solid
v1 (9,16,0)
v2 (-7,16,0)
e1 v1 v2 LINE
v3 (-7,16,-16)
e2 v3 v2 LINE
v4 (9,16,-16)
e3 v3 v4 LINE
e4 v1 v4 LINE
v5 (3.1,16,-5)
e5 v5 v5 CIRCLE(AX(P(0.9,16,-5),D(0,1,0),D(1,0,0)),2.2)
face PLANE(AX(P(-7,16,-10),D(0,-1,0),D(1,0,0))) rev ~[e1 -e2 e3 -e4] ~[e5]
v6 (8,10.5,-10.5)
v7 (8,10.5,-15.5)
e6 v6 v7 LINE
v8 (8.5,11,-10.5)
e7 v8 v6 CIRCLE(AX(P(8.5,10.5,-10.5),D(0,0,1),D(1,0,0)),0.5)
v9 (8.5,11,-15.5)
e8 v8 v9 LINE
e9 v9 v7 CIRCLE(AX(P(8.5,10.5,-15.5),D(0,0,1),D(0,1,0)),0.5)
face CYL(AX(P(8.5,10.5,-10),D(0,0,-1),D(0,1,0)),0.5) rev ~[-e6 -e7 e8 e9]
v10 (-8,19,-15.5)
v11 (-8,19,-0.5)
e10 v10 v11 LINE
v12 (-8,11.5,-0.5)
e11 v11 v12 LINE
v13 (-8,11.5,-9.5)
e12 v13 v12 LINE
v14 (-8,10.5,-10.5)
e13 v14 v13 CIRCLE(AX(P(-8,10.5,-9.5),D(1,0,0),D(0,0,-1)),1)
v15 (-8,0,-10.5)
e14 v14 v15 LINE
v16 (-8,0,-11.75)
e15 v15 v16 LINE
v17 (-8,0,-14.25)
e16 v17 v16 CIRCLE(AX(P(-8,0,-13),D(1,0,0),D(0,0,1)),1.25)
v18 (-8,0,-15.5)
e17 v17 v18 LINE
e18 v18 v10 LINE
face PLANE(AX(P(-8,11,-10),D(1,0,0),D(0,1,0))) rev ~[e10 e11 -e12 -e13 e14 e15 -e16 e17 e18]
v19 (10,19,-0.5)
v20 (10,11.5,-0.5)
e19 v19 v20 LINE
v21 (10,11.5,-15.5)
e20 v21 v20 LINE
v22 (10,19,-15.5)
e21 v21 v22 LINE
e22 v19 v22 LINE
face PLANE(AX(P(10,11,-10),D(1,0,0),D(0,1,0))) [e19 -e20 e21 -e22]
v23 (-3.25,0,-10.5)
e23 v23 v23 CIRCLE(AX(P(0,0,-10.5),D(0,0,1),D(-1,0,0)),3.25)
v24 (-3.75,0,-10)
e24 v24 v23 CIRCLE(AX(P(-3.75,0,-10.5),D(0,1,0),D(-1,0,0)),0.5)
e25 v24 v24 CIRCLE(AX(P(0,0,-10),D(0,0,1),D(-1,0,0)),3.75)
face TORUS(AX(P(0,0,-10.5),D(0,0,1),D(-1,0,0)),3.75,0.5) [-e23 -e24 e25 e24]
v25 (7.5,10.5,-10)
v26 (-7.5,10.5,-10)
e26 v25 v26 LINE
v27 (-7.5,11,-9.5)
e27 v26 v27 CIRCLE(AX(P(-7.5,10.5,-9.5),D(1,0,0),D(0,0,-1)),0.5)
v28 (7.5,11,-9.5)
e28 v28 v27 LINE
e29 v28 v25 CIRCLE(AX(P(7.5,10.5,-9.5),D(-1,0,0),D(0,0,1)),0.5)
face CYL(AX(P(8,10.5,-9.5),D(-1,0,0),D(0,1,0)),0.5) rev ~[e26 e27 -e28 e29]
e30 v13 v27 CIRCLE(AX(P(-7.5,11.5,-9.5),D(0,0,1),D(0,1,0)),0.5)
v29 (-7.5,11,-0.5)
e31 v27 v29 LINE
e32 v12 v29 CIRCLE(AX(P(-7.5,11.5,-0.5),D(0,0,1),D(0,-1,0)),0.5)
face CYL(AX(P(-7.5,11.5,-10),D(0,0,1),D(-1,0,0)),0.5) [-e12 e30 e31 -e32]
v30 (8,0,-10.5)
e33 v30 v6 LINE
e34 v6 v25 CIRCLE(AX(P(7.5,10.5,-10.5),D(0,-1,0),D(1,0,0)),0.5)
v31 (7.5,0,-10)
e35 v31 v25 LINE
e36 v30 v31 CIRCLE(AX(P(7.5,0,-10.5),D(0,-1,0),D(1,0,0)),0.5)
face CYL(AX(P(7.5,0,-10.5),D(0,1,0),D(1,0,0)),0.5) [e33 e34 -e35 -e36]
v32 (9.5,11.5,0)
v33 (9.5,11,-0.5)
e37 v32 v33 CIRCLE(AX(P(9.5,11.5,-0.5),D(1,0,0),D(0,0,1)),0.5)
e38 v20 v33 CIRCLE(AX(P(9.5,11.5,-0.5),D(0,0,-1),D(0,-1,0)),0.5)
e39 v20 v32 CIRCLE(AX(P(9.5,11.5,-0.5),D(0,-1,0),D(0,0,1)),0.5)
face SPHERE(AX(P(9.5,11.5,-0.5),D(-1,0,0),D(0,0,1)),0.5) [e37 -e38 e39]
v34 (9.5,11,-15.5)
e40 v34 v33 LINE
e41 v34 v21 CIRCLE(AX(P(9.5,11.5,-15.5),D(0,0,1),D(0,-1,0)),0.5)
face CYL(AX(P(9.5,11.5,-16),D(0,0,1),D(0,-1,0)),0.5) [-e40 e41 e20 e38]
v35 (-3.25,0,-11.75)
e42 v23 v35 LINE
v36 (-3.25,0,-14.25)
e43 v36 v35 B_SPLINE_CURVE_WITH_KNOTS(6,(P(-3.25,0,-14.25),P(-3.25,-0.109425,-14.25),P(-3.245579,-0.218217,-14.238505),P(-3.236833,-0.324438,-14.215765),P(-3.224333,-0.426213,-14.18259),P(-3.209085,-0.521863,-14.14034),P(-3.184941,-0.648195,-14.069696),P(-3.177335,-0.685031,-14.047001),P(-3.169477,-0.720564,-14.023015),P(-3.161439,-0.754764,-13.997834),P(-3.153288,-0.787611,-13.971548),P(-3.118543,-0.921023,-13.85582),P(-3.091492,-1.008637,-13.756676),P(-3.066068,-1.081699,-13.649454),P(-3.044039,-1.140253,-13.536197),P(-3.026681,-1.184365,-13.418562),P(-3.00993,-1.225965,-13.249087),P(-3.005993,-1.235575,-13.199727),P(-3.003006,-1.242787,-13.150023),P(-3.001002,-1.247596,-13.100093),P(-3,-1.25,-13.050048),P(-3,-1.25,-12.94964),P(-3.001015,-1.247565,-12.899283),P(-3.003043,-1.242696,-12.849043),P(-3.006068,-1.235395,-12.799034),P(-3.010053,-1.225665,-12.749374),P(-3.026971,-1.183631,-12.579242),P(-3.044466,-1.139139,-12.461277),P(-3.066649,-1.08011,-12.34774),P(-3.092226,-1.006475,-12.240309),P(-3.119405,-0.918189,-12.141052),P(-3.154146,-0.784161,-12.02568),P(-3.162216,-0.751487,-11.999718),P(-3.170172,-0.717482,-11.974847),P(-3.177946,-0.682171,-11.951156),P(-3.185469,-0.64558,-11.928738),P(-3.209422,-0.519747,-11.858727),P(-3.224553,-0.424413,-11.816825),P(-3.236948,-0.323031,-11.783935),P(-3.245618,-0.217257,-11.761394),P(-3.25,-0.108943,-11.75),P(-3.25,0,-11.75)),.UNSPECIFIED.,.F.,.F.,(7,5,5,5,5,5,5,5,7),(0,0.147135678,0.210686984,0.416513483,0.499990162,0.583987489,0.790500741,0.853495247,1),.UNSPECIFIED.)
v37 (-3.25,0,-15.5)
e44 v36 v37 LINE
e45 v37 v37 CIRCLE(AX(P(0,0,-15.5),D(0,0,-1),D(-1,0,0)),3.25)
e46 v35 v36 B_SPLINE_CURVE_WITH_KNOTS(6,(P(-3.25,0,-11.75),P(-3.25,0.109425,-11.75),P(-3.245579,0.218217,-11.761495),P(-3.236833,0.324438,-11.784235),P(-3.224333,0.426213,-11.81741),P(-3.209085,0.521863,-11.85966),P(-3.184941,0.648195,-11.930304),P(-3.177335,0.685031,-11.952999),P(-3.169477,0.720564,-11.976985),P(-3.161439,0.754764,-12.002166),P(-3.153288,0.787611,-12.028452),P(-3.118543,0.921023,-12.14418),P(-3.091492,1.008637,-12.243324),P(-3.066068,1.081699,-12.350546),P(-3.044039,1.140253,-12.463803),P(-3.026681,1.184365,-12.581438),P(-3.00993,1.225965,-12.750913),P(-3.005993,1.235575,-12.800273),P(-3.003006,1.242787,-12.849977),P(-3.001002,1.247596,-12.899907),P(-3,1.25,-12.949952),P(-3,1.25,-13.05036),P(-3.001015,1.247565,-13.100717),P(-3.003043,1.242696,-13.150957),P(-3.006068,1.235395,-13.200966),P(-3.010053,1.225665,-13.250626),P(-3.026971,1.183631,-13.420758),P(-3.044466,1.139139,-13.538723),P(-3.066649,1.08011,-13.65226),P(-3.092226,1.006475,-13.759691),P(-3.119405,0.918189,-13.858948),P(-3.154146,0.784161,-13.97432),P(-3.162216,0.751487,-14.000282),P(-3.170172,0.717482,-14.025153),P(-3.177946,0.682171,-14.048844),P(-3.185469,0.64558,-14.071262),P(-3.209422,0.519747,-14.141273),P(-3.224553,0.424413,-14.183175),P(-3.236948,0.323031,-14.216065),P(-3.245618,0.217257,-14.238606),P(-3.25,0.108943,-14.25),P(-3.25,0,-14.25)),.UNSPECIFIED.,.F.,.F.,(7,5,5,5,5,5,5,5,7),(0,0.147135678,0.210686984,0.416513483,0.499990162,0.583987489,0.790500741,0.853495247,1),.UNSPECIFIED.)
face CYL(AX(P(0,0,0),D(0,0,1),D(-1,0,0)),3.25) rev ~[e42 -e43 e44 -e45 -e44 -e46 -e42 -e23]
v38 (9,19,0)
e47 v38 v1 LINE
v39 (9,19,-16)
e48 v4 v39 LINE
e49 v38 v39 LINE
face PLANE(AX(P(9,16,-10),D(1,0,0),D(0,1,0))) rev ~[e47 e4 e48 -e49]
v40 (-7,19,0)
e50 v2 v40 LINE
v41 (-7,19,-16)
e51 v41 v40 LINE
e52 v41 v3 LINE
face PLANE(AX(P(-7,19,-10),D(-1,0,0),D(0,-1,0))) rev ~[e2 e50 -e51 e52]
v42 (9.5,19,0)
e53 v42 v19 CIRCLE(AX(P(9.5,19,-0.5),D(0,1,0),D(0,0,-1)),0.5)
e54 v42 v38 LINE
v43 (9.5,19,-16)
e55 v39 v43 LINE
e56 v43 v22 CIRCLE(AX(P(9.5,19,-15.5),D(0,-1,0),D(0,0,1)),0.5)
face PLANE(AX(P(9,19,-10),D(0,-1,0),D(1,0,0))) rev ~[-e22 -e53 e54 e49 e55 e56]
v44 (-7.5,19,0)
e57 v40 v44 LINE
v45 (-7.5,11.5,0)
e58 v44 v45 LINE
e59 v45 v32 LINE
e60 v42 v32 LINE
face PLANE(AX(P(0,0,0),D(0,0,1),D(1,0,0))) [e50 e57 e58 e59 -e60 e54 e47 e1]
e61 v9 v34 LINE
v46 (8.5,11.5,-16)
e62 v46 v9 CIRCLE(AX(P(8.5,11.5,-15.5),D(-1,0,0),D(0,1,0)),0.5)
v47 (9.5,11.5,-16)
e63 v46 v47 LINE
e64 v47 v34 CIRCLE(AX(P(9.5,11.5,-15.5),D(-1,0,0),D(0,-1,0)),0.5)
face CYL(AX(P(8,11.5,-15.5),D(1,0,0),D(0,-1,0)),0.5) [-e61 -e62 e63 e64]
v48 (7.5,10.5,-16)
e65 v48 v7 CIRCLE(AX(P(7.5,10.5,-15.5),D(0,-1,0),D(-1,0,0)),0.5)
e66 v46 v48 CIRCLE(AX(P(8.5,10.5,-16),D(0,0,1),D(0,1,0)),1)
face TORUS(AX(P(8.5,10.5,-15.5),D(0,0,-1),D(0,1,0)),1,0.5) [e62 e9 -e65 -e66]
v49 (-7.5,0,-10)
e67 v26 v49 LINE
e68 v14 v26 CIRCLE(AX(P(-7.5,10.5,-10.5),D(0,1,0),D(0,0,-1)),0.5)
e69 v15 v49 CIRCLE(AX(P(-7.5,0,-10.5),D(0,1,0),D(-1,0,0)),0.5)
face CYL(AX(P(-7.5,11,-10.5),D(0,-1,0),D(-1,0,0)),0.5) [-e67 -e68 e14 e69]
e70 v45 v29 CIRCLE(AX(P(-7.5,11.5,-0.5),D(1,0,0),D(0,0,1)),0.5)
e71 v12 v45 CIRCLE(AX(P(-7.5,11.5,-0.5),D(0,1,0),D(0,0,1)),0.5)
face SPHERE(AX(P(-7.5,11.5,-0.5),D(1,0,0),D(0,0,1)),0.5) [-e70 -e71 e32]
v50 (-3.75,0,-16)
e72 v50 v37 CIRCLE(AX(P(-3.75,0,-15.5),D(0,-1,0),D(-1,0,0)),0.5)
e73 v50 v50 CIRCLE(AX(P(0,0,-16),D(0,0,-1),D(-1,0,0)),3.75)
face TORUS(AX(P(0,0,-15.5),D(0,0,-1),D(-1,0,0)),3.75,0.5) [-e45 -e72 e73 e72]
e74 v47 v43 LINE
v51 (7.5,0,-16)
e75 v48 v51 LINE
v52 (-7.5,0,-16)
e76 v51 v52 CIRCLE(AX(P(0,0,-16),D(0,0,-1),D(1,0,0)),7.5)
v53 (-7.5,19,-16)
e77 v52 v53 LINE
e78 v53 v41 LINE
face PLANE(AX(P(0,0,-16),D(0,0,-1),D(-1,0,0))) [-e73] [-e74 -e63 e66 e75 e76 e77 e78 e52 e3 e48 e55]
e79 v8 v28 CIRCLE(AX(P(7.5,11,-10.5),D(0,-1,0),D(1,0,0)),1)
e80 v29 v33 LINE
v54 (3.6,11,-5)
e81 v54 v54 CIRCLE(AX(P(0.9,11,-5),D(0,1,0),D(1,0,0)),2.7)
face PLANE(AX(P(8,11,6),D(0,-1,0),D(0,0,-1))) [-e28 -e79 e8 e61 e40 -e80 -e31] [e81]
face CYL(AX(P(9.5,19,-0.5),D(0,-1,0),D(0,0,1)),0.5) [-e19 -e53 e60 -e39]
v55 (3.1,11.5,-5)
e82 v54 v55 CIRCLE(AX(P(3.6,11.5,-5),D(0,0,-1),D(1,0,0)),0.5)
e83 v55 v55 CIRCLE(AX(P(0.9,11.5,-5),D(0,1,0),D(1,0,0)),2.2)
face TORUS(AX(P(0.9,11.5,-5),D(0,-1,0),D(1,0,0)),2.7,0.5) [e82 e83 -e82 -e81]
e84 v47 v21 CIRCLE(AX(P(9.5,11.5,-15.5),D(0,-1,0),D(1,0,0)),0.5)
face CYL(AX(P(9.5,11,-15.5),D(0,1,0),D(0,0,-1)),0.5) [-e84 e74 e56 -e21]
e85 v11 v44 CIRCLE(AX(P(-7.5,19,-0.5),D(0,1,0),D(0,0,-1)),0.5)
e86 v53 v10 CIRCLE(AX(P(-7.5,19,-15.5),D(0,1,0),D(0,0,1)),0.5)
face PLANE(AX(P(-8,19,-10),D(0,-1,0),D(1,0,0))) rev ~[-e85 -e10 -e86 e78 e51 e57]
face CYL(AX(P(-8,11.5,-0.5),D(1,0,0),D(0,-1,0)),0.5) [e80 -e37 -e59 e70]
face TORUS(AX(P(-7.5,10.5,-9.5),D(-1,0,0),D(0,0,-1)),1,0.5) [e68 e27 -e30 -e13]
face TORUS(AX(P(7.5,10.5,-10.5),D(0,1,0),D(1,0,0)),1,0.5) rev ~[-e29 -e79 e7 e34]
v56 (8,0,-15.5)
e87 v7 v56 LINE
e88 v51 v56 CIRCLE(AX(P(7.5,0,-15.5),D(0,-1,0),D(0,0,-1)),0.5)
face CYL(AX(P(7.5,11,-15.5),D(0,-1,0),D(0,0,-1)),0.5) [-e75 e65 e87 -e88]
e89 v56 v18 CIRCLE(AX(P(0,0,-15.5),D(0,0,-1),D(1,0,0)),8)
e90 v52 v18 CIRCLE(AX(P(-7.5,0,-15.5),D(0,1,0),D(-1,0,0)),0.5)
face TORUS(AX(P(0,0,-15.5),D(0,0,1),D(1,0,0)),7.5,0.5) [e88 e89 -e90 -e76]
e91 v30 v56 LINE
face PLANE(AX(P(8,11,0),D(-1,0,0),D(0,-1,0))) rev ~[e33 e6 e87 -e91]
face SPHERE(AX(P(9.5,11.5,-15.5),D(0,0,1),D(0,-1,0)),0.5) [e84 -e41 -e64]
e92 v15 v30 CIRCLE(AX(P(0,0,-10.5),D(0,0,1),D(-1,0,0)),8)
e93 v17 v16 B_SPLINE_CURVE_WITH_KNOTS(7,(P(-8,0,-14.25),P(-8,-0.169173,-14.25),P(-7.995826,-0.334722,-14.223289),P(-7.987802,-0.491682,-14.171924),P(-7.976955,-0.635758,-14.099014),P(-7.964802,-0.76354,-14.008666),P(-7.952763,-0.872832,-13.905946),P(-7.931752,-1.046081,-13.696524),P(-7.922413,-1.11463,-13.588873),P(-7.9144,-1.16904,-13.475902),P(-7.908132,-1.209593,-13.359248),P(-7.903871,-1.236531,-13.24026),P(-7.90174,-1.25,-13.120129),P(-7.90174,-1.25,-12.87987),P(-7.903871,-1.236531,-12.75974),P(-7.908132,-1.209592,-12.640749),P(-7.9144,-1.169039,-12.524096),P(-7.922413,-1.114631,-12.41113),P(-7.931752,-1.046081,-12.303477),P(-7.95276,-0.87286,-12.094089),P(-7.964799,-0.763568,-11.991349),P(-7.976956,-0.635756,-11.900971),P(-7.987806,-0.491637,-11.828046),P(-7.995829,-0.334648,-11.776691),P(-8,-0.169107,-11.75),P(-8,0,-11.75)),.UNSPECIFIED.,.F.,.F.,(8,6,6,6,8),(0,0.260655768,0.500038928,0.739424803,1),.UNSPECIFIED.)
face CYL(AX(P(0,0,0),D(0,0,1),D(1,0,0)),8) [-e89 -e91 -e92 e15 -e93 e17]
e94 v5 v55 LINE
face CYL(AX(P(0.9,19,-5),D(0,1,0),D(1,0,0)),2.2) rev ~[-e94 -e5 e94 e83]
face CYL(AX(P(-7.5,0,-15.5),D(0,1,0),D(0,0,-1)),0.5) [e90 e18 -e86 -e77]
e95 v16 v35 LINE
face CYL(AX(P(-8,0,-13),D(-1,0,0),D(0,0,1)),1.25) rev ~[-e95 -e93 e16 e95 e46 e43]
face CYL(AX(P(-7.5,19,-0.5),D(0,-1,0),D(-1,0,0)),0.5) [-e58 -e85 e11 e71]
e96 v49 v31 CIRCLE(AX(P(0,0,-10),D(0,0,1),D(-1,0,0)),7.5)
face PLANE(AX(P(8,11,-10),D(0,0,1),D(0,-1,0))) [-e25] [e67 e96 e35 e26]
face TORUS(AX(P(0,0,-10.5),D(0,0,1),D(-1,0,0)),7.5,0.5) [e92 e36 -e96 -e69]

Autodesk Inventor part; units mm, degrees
sketch "Sketch1" plane through (0, 0, 0) normal (0, 0, 1) x (1, 0, 0)
  circle A0 centre (0, 0) radius 3.25
  circle A1 centre (0, 0) radius 8
  dimension "d0" = 6.5
  dimension "d1" = 16
extrude "Extrusion1" add sketch "Sketch1" along normal blind 6
sketch "Sketch2" plane through (0, 0, 0) normal (1, 0, 0) x (0, 1, 0)
  circle A0 centre (0, 2.5) radius 1.25
  point P0 (0, 0)
  dimension "d4" = 2.5
extrude "Extrusion2" cut sketch "Sketch2" against normal blind 20
ref_plane "Work Plane1" through (0, 0, 6) normal (0, 0, 1) x (1, 0, 0)
sketch "Sketch3" plane through (0, 0, 6) normal (0, 0, 1) x (1, 0, 0)
  circle A0 centre (0, 0) radius 7.5 projected
  line L0 (-8, 0) -> (8, 0)
  line L1 (8, 0) -> (8, 19)
  line L2 (8, 19) -> (-8, 19)
  line L3 (-8, 19) -> (-8, 0)
  dimension "d9" = 16
  dimension "d10" = 19
  dimension "d11" = 8
  dimension "d17" = 0
extrude "Extrusion3" add sketch "Sketch3" against normal blind 6 contours L0 A0 | A0 L0 L3 L2 L1 picked at (-1.3085, 5.1375)
sketch "Sketch4" plane through (0, 0, 0) normal (0, 0, -1) x (-1, 0, 0)
  line L0 (8, 0) -> (8, 19) projected
  line L1 (-8, 19) -> (8, 19)
  line L2 (8, 19) -> (8, 11)
  line L3 (8, 11) -> (-8, 11)
  line L4 (-8, 11) -> (-8, 19)
  dimension "d14" = 8
extrude "Extrusion4" add sketch "Sketch4" along normal blind 10
ref_plane "Work Plane4" through (-8, 19, 6) normal (0, 1, 0) x (1, 0, 0)
sketch "Sketch5" plane through (-8, 19, 6) normal (0, 1, 0) x (1, 0, 0)
  line L0 (16, 0) -> (16, 16) projected
  line L1 (0, 16) -> (16, 16) projected
  circle A0 centre (8.9, 11) radius 2.2
  point P0 (8, 6)
  dimension "d18" = 4.4
  dimension "d19" = 7.1
  dimension "d20" = 5
extrude "Extrusion5" cut sketch "Sketch5" against normal blind 10
ref_plane "Work Plane3" through (8, 0, 6) normal (1, 0, 0) x (0, 0, -1)
sketch "Sketch6" plane through (8, 0, 6) normal (1, 0, 0) x (0, 0, -1)
  line L0 (16, 19) -> (16, 11) projected
  line L1 (0, 19) -> (16, 19) projected
  line L2 (0, 19) -> (16, 19)
  line L3 (16, 19) -> (16, 11)
  line L4 (16, 11) -> (0, 11)
  line L5 (0, 11) -> (0, 19)
extrude "Extrusion6" add sketch "Sketch6" along normal blind 2
ref_plane "Work Plane5" through (-8, 19, 6) normal (0, 1, 0) x (1, 0, 0)
sketch "Sketch7" plane through (-8, 19, 6) normal (0, 1, 0) x (1, 0, 0)
  circle A0 centre (8.9, 11) radius 2.2 projected
  line L0 (18, 0) -> (0, 0) projected
  line L1 (18, 16) -> (18, 0) projected
  line L2 (0, 16) -> (18, 16) projected
  line L3 (17, 0) -> (1, 0)
  line L4 (1, 0) -> (1, 16)
  line L5 (1, 16) -> (17, 16)
  line L6 (17, 16) -> (17, 0)
  point P0 (8, 6)
  dimension "d25" = 16
  dimension "d26" = 1
extrude "Extrusion7" cut sketch "Sketch7" against normal blind 3 contours L0 L4 L2 L6
sketch "Sketch8" plane through (0, 0, 0) normal (0, 0, -1) x (-1, 0, 0)
  arc A0 (-3.75, 0) -> (3.75, 0) centre (0, 0) ccw projected
  circle A1 centre (0, 0) radius 3.25
  dimension "d29" = 6.5
extrude "Extrusion8" cut sketch "Sketch8" against normal through all
ref_plane "Work Plane2" through (-8, 0, 0.75) normal (-1, 0, 0) x (0, 0, 1)
sketch "Sketch9" plane through (-8, 0, 0.75) normal (-1, 0, 0) x (0, 0, 1)
  line L0 (3.5, 0) -> (0, 0) projected
  circle A0 centre (1.75, 0) radius 1.25
  point P0 (-0.75, 0)
  dimension "d35" = 2.5
extrude "Extrusion9" cut sketch "Sketch9" against normal blind 8
sketch "Sketch11" plane through (0, 0, -10) normal (0, 0, -1) x (-1, 0, 0)
  line L0 (-9, 16) -> (-9, 19) projected
  line L1 (8, 19) -> (-10, 19) projected
  line L2 (-10, 11) -> (-10, 19) projected
  line L3 (8, 11) -> (-10, 11) projected
  line L4 (8, 11) -> (8, 19) projected
  line L5 (8, 19) -> (7, 19) projected
  line L6 (7, 19) -> (7, 16) projected
  line L7 (7, 16) -> (-9, 16) projected
  point P0 (0, 0)
  point P1 (-8, 19)
  point P2 (-8, 11)
extrude "Extrusion10" add sketch "Sketch11" along normal blind 6 contours L7 L6 L1 L4 L3 L2 L0
sketch "Sketch13" plane through (0, 0, 0) normal (0, 0, -1) x (-1, 0, 0)
  circle A0 centre (0, 0) radius 3.25 projected
  line L0 (8, 11) -> (-8, 11) projected
  line L1 (-8, 11) -> (-8, 0) projected
  arc A1 (-8, 0) -> (8, 0) centre (0, 0) ccw projected
  line L2 (8, 0) -> (8, 11) projected
extrude "Extrusion11" add sketch "Sketch13" along normal blind 16
sketch "Sketch15" plane through (8, 0, 6) normal (1, 0, 0) x (0, 0, -1)
  line L0 (0, 11) -> (16, 11)
  line L1 (16, 11) -> (16, -8.6618)
  line L2 (16, -8.6618) -> (0, -8.6618)
  line L3 (0, -8.6618) -> (0, 11)
  point P0 (6, 0)
  dimension "d43" = 16
extrude "Extrusion12" cut sketch "Sketch15" against normal blind 16
sketch "Sketch16" plane through (-8, 11, 6) normal (-1, 0, 0) x (0, 0, 1)
  line L0 (-22, -11) -> (-16, -11) projected
  circle A0 centre (-19, -11) radius 1.25
  point P0 (-6, -11)
  dimension "d46" = 2.5
extrude "Extrusion13" cut sketch "Sketch16" against normal blind 7
sketch "Sketch17" plane through (0, 0, 6) normal (0, 0, 1) x (1, 0, 0)
  line L0 (-8, 11) -> (10, 11) projected
  line L1 (10, 19) -> (10, 11) projected
  line L2 (10, 19) -> (9, 19) projected
  line L3 (9, 19) -> (9, 16) projected
  line L4 (9, 16) -> (-7, 16) projected
  line L5 (-7, 16) -> (-7, 19) projected
  line L6 (-7, 19) -> (-8, 19) projected
  line L7 (-8, 19) -> (-8, 11) projected
  point P0 (0, 0)
extrude "Extrusion14" cut sketch "Sketch17" against normal blind 6
fillet "Fillet9" radius 0.5 18 edges at (1, 11, 0) (-8, 15, 0) (10, 15, 0) (10, 11, -8) (0, 11, -10) (0, -8, -10) (-8, 5.5, -10) (8, 5.5, -10) (8, 11, -13) (9, 11, -16) (0, -8, -16) (-8, 9.5, -16) (8, 5.5, -16) (10, 15, -16) (-8, 11, -5) (-1.3, 11, -5) (3.25, 0, -10) (3.25, 0, -16)
properties part number "6mmRingBracketLeft"
